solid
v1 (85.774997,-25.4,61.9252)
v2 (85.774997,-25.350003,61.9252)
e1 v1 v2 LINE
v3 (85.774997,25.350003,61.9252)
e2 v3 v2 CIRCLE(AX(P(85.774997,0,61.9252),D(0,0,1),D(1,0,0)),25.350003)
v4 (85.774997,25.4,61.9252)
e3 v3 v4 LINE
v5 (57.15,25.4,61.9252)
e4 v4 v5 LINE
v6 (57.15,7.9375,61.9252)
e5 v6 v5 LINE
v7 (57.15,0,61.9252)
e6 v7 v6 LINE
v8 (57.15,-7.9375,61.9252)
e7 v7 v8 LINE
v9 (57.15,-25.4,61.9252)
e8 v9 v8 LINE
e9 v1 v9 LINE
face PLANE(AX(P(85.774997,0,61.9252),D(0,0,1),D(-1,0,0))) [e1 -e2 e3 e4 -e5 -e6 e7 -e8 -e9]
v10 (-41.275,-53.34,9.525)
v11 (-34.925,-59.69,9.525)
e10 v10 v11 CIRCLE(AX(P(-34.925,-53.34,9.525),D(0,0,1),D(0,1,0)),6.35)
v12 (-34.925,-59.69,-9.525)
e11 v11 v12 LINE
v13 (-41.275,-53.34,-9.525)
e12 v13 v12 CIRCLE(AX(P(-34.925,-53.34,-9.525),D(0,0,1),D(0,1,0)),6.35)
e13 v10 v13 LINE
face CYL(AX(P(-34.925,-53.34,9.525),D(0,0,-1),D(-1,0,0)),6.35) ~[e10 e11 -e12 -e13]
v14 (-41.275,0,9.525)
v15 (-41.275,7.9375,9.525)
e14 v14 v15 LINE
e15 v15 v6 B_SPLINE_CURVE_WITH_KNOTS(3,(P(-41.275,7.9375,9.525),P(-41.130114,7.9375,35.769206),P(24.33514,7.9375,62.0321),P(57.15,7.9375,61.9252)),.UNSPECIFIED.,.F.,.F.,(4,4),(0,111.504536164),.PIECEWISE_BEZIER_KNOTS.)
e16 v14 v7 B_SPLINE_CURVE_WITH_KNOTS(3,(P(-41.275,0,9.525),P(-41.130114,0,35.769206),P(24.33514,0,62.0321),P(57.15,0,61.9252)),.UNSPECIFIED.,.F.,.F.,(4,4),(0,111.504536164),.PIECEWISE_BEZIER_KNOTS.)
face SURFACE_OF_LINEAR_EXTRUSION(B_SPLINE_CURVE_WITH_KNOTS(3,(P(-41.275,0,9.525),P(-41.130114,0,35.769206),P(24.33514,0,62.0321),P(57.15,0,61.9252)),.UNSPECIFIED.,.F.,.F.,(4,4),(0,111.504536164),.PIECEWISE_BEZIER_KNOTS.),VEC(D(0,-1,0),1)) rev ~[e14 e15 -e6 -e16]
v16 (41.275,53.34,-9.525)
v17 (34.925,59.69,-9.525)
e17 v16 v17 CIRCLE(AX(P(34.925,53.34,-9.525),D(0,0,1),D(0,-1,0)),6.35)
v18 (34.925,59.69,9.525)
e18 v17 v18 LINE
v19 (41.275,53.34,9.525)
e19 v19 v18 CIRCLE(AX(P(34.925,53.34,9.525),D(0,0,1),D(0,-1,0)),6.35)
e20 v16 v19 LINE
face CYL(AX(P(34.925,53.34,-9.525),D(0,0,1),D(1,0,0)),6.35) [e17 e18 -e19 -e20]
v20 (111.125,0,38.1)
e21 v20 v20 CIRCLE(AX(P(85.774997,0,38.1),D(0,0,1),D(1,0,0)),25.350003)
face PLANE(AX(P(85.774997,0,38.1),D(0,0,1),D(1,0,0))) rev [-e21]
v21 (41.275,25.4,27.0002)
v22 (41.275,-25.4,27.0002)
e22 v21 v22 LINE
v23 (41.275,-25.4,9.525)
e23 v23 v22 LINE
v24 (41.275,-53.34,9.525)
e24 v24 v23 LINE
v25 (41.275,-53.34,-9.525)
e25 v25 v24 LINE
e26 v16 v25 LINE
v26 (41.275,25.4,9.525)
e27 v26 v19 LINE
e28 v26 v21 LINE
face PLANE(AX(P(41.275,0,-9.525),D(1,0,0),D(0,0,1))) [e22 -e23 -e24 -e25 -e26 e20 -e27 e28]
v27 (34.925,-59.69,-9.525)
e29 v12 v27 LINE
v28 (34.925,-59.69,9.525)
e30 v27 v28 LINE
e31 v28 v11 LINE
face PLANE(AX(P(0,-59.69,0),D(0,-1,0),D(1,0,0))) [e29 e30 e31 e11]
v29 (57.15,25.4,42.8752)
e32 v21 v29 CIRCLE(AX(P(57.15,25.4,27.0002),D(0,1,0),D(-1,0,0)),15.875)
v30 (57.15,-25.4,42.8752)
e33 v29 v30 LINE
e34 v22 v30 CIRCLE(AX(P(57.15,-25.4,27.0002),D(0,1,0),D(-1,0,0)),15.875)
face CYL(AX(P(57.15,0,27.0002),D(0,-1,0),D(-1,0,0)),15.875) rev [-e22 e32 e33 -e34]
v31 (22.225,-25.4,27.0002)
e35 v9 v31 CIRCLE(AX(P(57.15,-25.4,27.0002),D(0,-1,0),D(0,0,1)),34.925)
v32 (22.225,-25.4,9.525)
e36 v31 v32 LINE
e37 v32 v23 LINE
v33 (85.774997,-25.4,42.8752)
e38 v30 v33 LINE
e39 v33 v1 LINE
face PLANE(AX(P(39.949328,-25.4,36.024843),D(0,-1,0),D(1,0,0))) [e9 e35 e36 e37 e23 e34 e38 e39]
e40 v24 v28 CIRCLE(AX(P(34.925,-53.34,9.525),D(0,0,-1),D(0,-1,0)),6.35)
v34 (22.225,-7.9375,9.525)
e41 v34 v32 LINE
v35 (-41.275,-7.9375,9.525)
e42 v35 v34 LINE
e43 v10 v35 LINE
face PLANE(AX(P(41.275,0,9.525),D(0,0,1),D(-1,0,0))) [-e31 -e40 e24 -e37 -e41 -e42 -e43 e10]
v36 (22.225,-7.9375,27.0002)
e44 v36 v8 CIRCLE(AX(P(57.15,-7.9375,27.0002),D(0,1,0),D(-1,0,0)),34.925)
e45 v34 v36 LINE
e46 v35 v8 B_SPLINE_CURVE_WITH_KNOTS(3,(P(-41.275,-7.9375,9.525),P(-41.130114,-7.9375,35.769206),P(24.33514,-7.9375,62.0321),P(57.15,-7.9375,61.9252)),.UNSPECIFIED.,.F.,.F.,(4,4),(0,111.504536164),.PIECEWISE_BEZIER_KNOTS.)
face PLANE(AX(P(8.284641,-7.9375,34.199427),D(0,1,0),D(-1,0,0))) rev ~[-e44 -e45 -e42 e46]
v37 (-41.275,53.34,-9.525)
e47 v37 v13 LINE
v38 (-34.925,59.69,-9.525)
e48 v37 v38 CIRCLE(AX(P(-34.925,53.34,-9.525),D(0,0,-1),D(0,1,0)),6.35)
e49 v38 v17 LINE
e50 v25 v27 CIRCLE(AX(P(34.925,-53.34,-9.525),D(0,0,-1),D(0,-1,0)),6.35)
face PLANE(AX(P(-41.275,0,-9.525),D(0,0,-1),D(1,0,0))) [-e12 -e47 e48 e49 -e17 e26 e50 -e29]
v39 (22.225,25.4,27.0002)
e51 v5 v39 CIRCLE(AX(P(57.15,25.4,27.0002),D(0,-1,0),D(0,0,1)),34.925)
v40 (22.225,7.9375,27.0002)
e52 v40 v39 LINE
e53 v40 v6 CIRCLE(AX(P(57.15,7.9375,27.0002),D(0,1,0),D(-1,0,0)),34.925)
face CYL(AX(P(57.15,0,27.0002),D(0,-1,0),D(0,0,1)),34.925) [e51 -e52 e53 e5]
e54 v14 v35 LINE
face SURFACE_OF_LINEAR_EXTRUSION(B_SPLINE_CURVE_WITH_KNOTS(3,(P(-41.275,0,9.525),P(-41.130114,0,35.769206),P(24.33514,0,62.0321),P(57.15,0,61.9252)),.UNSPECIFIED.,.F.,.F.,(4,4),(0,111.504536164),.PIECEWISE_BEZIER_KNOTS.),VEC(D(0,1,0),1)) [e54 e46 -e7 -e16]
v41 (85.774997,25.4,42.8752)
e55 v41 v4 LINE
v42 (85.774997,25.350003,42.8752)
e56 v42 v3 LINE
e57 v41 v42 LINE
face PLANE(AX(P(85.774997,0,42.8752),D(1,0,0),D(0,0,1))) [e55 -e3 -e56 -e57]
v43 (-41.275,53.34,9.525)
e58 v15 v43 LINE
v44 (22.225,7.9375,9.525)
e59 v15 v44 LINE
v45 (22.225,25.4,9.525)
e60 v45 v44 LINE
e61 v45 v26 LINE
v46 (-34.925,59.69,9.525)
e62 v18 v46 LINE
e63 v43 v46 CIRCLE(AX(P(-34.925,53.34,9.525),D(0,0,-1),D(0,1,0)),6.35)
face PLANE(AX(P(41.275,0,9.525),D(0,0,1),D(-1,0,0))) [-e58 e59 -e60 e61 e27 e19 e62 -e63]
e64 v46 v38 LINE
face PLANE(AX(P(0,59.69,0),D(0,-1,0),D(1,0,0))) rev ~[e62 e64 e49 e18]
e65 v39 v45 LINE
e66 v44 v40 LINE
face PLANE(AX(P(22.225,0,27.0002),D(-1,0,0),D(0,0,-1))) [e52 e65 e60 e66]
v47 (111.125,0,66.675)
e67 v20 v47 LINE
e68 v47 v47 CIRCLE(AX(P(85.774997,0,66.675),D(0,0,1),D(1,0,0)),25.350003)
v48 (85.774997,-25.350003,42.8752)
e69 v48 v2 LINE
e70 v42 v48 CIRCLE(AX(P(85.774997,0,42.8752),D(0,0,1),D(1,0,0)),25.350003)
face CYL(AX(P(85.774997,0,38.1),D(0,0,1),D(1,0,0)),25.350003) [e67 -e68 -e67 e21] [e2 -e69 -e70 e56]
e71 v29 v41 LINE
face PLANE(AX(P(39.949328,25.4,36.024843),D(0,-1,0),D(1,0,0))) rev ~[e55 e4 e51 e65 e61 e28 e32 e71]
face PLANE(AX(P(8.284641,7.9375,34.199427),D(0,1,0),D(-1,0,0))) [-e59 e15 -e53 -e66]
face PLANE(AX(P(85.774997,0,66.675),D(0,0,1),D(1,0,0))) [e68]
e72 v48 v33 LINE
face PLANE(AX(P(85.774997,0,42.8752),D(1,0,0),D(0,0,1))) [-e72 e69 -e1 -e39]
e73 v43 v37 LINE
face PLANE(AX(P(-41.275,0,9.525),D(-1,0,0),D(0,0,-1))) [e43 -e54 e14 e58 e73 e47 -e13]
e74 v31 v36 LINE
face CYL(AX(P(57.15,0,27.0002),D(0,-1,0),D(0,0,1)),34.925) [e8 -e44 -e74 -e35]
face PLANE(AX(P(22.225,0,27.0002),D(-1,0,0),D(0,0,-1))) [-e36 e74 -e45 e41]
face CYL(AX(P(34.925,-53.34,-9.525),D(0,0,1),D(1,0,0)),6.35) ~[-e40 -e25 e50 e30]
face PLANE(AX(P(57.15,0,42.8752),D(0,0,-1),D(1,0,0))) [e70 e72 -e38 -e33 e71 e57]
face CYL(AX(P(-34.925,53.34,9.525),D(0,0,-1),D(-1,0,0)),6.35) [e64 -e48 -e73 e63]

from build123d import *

# Parameters (mm, degrees)
F1_DEPTH = 59.69
F2_DEPTH = 25.4
F4_DEPTH = 7.9375
F6_R     = 6.35


# Not quite as in the source:
# - a feature of the source that left no trace in its solid (it failed there, or was rolled back) is left out


with BuildPart() as f1:
    # F0 (on Front) → F1 (new body, symmetric)
    with BuildSketch(Plane.XZ):
        Polygon((22.225, 9.525), (-41.275, 9.525), (-41.275, -9.525), (41.275, -9.525), (41.275, 9.525), align=None)
    extrude(amount=F1_DEPTH, both=True)

    # F0 (on Front) → F2 (join, symmetric)
    with BuildSketch(Plane.XZ):
        with BuildLine():
            Line((22.225, 27.0002), (22.225, 9.525))
            Line((22.225, 9.525), (41.275, 9.525))
            Line((41.275, 9.525), (41.275, 27.0002))
            ThreePointArc((41.275, 27.0002), (45.9246798487, 38.2255201513), (57.15, 42.8752))
            Line((57.15, 42.8752), (60.325, 42.8752))
            Line((60.325, 42.8752), (60.325, 61.9252))
            Line((60.325, 61.9252), (57.15, 61.9252))
            ThreePointArc((57.15, 61.9252), (32.4542956671, 51.6959043329), (22.225, 27.0002))
        make_face()
        Polygon((85.7749970019, 61.9252), (60.325, 61.9252), (60.325, 42.8752), (85.7749970019, 42.8752), (85.7749970019, 46.5751625597), align=None)
    extrude(amount=F2_DEPTH, both=True)

    # F0 (on Front) → F4 (join, symmetric)
    with BuildSketch(Plane.XZ):
        with BuildLine():
            add(Edge.make_bspline(
                [(-41.275, 9.525), (-41.1301143467, 35.7692055404), (24.3351403624, 62.0320998132), (57.15, 61.9252)],
                knots=[0, 0, 0, 0, 111.5045361635, 111.5045361635, 111.5045361635, 111.5045361635], degree=3))
            Line((-41.275, 9.525), (22.225, 9.525))
            Line((22.225, 9.525), (22.225, 27.0002))
            ThreePointArc((22.225, 27.0002), (32.4542956671, 51.6959043329), (57.15, 61.9252))
        make_face()
    extrude(amount=F4_DEPTH, both=True)

    # F0 (on Front) → F5 (revolve)
    with BuildSketch(Plane.XZ):
        Polygon((85.7749970019, 66.675), (85.7749970019, 61.9252), (85.7749970019, 46.5751625597), (85.7749970019, 42.8752), (85.7749970019, 38.1), (111.125, 38.1), (111.125, 66.675), align=None)
    revolve(axis=Axis((85.7749970019, 0, 56.6250812799), (0, 0, 1)))

    # F6
    f6_edges = [f1.edges().sort_by_distance(p)[0] for p in [
        (41.275, -59.69, 0),
        (-41.275, -59.69, 0),
        (-41.275, 59.69, 0),
        (41.275, 59.69, 0),
    ]]
    fillet(f6_edges, radius=F6_R)


solid = f1.part
